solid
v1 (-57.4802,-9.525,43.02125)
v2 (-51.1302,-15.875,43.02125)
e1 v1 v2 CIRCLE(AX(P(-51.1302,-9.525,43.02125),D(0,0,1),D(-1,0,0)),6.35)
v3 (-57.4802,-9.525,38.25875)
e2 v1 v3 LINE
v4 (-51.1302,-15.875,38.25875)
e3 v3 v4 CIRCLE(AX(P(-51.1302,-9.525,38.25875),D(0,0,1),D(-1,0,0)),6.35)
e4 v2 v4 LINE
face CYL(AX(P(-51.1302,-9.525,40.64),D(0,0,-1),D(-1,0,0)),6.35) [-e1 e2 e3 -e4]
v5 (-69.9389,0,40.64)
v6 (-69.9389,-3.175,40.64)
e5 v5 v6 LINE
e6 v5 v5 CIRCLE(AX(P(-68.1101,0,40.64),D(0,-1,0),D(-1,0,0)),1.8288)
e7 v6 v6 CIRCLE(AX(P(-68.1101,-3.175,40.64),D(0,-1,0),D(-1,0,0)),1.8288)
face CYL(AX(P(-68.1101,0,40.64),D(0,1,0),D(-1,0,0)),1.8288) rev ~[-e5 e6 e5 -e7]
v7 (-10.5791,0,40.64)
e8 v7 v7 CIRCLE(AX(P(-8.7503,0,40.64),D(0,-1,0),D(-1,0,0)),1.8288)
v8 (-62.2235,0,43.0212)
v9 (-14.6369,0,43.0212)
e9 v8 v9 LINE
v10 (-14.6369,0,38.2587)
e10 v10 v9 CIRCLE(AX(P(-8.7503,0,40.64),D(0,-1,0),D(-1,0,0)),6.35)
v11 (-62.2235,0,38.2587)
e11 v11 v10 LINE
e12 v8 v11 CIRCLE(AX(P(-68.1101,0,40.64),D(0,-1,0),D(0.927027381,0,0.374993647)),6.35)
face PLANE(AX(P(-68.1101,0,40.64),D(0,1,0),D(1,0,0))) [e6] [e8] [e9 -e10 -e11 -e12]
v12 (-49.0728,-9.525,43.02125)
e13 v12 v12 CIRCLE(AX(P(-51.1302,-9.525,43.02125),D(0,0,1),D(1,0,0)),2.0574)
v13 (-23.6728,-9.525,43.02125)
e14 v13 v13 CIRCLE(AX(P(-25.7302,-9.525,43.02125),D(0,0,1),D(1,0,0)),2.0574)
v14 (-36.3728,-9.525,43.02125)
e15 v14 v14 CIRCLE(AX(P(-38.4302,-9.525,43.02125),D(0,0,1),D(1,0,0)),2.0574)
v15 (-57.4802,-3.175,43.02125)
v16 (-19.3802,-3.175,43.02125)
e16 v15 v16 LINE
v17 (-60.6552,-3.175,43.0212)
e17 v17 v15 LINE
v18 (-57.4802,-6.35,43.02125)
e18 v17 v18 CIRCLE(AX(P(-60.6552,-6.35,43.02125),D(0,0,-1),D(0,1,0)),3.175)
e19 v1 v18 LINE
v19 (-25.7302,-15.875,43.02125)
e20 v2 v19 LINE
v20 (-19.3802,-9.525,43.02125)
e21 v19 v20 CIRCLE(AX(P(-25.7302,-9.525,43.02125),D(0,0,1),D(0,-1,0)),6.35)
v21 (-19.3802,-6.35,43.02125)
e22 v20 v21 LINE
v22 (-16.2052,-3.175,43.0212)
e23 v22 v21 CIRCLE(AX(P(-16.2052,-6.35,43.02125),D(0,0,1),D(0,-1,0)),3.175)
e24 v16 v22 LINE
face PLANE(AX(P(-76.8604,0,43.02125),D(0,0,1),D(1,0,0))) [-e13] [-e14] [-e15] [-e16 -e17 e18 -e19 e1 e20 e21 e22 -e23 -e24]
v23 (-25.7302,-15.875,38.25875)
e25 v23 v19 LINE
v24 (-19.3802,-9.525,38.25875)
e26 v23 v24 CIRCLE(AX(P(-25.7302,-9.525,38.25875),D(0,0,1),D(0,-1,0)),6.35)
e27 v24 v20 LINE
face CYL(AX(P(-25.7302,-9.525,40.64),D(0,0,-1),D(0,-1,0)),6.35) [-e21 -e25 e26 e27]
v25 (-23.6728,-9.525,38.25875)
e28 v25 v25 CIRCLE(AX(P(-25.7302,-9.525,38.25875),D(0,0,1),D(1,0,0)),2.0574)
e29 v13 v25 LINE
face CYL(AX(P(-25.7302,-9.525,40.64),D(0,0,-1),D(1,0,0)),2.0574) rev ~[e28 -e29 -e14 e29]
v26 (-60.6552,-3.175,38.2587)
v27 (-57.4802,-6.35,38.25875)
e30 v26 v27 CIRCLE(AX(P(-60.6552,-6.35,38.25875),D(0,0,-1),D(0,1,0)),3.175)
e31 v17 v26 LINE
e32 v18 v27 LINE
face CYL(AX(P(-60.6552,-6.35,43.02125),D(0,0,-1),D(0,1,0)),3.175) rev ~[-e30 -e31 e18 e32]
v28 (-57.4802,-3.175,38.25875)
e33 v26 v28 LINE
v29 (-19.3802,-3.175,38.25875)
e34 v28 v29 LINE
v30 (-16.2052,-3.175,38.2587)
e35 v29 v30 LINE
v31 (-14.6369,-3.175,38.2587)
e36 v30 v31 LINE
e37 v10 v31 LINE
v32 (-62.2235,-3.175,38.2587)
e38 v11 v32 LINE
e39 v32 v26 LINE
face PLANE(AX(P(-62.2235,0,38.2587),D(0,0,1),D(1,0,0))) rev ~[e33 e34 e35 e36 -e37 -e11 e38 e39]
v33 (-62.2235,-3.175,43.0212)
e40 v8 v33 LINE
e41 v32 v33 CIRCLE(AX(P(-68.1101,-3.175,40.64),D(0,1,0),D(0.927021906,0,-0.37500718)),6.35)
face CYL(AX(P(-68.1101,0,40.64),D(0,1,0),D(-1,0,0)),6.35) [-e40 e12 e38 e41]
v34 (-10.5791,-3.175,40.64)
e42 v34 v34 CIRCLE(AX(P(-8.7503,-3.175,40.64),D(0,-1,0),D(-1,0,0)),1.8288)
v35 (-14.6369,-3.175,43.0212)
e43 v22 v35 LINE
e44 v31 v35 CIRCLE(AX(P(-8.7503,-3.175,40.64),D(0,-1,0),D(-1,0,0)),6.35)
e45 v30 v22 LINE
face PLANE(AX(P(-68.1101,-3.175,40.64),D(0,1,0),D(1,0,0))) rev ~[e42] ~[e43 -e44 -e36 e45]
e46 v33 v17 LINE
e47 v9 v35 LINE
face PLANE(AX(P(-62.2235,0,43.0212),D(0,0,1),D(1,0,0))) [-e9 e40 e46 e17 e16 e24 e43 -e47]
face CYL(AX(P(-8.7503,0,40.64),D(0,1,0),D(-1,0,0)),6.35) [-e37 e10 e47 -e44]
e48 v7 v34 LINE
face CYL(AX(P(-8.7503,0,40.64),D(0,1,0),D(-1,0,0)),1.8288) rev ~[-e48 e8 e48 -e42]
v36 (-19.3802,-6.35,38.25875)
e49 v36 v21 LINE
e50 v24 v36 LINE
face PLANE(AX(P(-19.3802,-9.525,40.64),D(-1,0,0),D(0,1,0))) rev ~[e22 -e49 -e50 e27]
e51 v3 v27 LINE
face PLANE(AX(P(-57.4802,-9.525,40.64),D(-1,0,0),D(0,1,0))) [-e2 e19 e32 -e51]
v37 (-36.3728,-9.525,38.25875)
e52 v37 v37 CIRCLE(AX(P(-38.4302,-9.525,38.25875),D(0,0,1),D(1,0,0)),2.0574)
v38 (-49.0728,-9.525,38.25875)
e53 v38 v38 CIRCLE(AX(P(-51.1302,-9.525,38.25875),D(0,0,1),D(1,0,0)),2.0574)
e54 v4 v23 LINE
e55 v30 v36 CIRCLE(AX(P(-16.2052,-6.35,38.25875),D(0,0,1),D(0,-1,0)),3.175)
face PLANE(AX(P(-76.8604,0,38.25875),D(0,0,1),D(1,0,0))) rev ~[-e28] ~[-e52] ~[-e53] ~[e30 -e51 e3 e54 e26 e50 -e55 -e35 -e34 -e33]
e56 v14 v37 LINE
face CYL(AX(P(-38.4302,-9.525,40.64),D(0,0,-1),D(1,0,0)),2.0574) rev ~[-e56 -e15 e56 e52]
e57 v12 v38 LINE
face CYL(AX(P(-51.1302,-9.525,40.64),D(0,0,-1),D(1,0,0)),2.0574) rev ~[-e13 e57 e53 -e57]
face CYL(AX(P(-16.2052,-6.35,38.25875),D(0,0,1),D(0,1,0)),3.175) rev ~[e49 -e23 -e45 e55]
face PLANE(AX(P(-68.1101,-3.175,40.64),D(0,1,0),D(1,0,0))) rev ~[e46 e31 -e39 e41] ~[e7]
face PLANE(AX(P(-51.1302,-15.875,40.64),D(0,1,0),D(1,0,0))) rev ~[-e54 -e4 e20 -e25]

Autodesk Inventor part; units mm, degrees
ref_plane "YZ Plane" through (0, 0, 0) normal (1, 0, 0) x (0, 1, 0)
ref_plane "Work Plane1" through (-38.4302, 0, 40.64) normal (0, -1, 0) x (-1, 0, 0)
sketch "Sketch1" plane through (-38.4302, 0, 40.64) normal (0, -1, 0) x (-1, 0, 0)
  circle A0 centre (29.6799, 0) radius 1.8288 construction
  circle A1 centre (-29.6799, 0) radius 1.8288 construction
  line L0 (-34.4805, -7.5946) -> (34.4805, -7.5946) construction
  line L1 (34.4805, -7.5946) -> (34.4805, -19.2786) construction
  line L2 (34.4805, -19.2786) -> (-34.4805, -19.2786) construction
  line L3 (-34.4805, -19.2786) -> (-34.4805, -7.5946) construction
  line L4 (34.4805, 7.5946) -> (-34.4805, 7.5946) construction
  line L5 (-34.4805, 7.5946) -> (-34.4805, 19.2786) construction
  line L6 (-34.4805, 19.2786) -> (34.4805, 19.2786) construction
  line L7 (34.4805, 19.2786) -> (34.4805, 7.5946) construction
  line L8 (-38.4302, 27.94) -> (38.4302, 27.94) construction
  line L9 (-38.4302, -27.94) -> (-38.4302, 27.94) construction
  line L10 (38.4302, -27.94) -> (-38.4302, -27.94) construction
  line L11 (38.4302, 27.94) -> (38.4302, -27.94) construction
  circle A2 centre (-29.6799, 0) radius 1.8288
  circle A3 centre (29.6799, 0) radius 1.8288
  circle A4 centre (29.6799, 0) radius 6.35
  circle A5 centre (-29.6799, 0) radius 6.35
  point P0 (-38.4302, 40.64)
  dimension "d0" = 12.7
  dimension "d1" = 12.7
extrude "Extrusion1" add sketch "Sketch1" along normal blind 3.175
ref_plane "Work Plane2" through (-76.8604, 0, 40.64) normal (0, 0, 1) x (1, 0, 0)
sketch "Sketch2" plane through (-76.8604, 0, 40.64) normal (0, 0, 1) x (1, 0, 0)
  line L0 (10.5791, -3.175) -> (6.9215, -3.175) construction
  line L1 (6.9215, 0) -> (10.5791, 0) construction
  line L2 (69.9389, -3.175) -> (66.2813, -3.175) construction
  line L3 (66.2813, 0) -> (69.9389, 0) construction
  line L4 (6.9215, 0) -> (10.5791, 0) construction
  line L5 (8.7503, 0) -> (68.1101, 0) construction
  line L6 (-4.3871, -3.175) -> (85.3512, -3.175) construction
  circle A0 centre (38.4302, -9.525) radius 2.0574
  circle A1 centre (38.4302, -9.525) radius 6.35 construction
  line L7 (38.4302, 0) -> (38.4302, -31.2723) construction
  circle A2 centre (51.1302, -9.525) radius 2.0574
  arc A3 (51.1302, -15.875) -> (57.4802, -9.525) centre (51.1302, -9.525) ccw
  circle A4 centre (25.7302, -9.525) radius 2.0574
  arc A5 (19.3802, -9.525) -> (25.7302, -15.875) centre (25.7302, -9.525) ccw
  line L8 (25.7302, -15.875) -> (51.1302, -15.875)
  line L9 (19.3802, -3.175) -> (57.4802, -3.175)
  line L10 (19.3802, -9.525) -> (19.3802, -3.175)
  line L11 (57.4802, -9.525) -> (57.4802, -3.175)
  point P0 (76.8604, 0)
  point P1 (25.7302, -3.175)
  point P2 (51.1302, -3.175)
  dimension "d4" = 3.175
  dimension "d5" = 4.1148
  dimension "d6" = 12.7
  dimension "d7" = 4.1148
  dimension "d8" = 12.7
extrude "Extrusion2" add sketch "Sketch2" along normal mid plane 4.7625
sketch "Sketch3" plane through (-68.1101, 0, 40.64) normal (0, 1, 0) x (1, 0, 0)
  circle A0 centre (0, 0) radius 6.35 construction
  circle A1 centre (59.3598, 0) radius 6.35 construction
  line L0 (10.6299, 2.3813) -> (48.7299, 2.3813) construction
  line L1 (48.7299, -2.3812) -> (10.6299, -2.3812) construction
  line L2 (5.8866, 2.3813) -> (53.4732, 2.3813)
  line L3 (5.8866, -2.3812) -> (53.4732, -2.3812)
  circle A2 centre (0, 0) radius 1.8288 construction
  arc A3 (5.8866, -2.3812) -> (5.8866, 2.3813) centre (0, 0) ccw
  circle A4 centre (59.3598, 0) radius 1.8288 construction
  arc A5 (53.4732, 2.3813) -> (53.4732, -2.3812) centre (59.3598, 0) ccw
  point P0 (68.1101, 40.64)
extrude "Extrusion3" add sketch "Sketch3" against normal up to surface (3.175 mm away)
fillet "Fillet1" radius 3.175 2 edges at (-19.3802, -3.175, 40.64) (-57.4802, -3.175, 40.64)
properties part number "ChassisPrototypeA3"
